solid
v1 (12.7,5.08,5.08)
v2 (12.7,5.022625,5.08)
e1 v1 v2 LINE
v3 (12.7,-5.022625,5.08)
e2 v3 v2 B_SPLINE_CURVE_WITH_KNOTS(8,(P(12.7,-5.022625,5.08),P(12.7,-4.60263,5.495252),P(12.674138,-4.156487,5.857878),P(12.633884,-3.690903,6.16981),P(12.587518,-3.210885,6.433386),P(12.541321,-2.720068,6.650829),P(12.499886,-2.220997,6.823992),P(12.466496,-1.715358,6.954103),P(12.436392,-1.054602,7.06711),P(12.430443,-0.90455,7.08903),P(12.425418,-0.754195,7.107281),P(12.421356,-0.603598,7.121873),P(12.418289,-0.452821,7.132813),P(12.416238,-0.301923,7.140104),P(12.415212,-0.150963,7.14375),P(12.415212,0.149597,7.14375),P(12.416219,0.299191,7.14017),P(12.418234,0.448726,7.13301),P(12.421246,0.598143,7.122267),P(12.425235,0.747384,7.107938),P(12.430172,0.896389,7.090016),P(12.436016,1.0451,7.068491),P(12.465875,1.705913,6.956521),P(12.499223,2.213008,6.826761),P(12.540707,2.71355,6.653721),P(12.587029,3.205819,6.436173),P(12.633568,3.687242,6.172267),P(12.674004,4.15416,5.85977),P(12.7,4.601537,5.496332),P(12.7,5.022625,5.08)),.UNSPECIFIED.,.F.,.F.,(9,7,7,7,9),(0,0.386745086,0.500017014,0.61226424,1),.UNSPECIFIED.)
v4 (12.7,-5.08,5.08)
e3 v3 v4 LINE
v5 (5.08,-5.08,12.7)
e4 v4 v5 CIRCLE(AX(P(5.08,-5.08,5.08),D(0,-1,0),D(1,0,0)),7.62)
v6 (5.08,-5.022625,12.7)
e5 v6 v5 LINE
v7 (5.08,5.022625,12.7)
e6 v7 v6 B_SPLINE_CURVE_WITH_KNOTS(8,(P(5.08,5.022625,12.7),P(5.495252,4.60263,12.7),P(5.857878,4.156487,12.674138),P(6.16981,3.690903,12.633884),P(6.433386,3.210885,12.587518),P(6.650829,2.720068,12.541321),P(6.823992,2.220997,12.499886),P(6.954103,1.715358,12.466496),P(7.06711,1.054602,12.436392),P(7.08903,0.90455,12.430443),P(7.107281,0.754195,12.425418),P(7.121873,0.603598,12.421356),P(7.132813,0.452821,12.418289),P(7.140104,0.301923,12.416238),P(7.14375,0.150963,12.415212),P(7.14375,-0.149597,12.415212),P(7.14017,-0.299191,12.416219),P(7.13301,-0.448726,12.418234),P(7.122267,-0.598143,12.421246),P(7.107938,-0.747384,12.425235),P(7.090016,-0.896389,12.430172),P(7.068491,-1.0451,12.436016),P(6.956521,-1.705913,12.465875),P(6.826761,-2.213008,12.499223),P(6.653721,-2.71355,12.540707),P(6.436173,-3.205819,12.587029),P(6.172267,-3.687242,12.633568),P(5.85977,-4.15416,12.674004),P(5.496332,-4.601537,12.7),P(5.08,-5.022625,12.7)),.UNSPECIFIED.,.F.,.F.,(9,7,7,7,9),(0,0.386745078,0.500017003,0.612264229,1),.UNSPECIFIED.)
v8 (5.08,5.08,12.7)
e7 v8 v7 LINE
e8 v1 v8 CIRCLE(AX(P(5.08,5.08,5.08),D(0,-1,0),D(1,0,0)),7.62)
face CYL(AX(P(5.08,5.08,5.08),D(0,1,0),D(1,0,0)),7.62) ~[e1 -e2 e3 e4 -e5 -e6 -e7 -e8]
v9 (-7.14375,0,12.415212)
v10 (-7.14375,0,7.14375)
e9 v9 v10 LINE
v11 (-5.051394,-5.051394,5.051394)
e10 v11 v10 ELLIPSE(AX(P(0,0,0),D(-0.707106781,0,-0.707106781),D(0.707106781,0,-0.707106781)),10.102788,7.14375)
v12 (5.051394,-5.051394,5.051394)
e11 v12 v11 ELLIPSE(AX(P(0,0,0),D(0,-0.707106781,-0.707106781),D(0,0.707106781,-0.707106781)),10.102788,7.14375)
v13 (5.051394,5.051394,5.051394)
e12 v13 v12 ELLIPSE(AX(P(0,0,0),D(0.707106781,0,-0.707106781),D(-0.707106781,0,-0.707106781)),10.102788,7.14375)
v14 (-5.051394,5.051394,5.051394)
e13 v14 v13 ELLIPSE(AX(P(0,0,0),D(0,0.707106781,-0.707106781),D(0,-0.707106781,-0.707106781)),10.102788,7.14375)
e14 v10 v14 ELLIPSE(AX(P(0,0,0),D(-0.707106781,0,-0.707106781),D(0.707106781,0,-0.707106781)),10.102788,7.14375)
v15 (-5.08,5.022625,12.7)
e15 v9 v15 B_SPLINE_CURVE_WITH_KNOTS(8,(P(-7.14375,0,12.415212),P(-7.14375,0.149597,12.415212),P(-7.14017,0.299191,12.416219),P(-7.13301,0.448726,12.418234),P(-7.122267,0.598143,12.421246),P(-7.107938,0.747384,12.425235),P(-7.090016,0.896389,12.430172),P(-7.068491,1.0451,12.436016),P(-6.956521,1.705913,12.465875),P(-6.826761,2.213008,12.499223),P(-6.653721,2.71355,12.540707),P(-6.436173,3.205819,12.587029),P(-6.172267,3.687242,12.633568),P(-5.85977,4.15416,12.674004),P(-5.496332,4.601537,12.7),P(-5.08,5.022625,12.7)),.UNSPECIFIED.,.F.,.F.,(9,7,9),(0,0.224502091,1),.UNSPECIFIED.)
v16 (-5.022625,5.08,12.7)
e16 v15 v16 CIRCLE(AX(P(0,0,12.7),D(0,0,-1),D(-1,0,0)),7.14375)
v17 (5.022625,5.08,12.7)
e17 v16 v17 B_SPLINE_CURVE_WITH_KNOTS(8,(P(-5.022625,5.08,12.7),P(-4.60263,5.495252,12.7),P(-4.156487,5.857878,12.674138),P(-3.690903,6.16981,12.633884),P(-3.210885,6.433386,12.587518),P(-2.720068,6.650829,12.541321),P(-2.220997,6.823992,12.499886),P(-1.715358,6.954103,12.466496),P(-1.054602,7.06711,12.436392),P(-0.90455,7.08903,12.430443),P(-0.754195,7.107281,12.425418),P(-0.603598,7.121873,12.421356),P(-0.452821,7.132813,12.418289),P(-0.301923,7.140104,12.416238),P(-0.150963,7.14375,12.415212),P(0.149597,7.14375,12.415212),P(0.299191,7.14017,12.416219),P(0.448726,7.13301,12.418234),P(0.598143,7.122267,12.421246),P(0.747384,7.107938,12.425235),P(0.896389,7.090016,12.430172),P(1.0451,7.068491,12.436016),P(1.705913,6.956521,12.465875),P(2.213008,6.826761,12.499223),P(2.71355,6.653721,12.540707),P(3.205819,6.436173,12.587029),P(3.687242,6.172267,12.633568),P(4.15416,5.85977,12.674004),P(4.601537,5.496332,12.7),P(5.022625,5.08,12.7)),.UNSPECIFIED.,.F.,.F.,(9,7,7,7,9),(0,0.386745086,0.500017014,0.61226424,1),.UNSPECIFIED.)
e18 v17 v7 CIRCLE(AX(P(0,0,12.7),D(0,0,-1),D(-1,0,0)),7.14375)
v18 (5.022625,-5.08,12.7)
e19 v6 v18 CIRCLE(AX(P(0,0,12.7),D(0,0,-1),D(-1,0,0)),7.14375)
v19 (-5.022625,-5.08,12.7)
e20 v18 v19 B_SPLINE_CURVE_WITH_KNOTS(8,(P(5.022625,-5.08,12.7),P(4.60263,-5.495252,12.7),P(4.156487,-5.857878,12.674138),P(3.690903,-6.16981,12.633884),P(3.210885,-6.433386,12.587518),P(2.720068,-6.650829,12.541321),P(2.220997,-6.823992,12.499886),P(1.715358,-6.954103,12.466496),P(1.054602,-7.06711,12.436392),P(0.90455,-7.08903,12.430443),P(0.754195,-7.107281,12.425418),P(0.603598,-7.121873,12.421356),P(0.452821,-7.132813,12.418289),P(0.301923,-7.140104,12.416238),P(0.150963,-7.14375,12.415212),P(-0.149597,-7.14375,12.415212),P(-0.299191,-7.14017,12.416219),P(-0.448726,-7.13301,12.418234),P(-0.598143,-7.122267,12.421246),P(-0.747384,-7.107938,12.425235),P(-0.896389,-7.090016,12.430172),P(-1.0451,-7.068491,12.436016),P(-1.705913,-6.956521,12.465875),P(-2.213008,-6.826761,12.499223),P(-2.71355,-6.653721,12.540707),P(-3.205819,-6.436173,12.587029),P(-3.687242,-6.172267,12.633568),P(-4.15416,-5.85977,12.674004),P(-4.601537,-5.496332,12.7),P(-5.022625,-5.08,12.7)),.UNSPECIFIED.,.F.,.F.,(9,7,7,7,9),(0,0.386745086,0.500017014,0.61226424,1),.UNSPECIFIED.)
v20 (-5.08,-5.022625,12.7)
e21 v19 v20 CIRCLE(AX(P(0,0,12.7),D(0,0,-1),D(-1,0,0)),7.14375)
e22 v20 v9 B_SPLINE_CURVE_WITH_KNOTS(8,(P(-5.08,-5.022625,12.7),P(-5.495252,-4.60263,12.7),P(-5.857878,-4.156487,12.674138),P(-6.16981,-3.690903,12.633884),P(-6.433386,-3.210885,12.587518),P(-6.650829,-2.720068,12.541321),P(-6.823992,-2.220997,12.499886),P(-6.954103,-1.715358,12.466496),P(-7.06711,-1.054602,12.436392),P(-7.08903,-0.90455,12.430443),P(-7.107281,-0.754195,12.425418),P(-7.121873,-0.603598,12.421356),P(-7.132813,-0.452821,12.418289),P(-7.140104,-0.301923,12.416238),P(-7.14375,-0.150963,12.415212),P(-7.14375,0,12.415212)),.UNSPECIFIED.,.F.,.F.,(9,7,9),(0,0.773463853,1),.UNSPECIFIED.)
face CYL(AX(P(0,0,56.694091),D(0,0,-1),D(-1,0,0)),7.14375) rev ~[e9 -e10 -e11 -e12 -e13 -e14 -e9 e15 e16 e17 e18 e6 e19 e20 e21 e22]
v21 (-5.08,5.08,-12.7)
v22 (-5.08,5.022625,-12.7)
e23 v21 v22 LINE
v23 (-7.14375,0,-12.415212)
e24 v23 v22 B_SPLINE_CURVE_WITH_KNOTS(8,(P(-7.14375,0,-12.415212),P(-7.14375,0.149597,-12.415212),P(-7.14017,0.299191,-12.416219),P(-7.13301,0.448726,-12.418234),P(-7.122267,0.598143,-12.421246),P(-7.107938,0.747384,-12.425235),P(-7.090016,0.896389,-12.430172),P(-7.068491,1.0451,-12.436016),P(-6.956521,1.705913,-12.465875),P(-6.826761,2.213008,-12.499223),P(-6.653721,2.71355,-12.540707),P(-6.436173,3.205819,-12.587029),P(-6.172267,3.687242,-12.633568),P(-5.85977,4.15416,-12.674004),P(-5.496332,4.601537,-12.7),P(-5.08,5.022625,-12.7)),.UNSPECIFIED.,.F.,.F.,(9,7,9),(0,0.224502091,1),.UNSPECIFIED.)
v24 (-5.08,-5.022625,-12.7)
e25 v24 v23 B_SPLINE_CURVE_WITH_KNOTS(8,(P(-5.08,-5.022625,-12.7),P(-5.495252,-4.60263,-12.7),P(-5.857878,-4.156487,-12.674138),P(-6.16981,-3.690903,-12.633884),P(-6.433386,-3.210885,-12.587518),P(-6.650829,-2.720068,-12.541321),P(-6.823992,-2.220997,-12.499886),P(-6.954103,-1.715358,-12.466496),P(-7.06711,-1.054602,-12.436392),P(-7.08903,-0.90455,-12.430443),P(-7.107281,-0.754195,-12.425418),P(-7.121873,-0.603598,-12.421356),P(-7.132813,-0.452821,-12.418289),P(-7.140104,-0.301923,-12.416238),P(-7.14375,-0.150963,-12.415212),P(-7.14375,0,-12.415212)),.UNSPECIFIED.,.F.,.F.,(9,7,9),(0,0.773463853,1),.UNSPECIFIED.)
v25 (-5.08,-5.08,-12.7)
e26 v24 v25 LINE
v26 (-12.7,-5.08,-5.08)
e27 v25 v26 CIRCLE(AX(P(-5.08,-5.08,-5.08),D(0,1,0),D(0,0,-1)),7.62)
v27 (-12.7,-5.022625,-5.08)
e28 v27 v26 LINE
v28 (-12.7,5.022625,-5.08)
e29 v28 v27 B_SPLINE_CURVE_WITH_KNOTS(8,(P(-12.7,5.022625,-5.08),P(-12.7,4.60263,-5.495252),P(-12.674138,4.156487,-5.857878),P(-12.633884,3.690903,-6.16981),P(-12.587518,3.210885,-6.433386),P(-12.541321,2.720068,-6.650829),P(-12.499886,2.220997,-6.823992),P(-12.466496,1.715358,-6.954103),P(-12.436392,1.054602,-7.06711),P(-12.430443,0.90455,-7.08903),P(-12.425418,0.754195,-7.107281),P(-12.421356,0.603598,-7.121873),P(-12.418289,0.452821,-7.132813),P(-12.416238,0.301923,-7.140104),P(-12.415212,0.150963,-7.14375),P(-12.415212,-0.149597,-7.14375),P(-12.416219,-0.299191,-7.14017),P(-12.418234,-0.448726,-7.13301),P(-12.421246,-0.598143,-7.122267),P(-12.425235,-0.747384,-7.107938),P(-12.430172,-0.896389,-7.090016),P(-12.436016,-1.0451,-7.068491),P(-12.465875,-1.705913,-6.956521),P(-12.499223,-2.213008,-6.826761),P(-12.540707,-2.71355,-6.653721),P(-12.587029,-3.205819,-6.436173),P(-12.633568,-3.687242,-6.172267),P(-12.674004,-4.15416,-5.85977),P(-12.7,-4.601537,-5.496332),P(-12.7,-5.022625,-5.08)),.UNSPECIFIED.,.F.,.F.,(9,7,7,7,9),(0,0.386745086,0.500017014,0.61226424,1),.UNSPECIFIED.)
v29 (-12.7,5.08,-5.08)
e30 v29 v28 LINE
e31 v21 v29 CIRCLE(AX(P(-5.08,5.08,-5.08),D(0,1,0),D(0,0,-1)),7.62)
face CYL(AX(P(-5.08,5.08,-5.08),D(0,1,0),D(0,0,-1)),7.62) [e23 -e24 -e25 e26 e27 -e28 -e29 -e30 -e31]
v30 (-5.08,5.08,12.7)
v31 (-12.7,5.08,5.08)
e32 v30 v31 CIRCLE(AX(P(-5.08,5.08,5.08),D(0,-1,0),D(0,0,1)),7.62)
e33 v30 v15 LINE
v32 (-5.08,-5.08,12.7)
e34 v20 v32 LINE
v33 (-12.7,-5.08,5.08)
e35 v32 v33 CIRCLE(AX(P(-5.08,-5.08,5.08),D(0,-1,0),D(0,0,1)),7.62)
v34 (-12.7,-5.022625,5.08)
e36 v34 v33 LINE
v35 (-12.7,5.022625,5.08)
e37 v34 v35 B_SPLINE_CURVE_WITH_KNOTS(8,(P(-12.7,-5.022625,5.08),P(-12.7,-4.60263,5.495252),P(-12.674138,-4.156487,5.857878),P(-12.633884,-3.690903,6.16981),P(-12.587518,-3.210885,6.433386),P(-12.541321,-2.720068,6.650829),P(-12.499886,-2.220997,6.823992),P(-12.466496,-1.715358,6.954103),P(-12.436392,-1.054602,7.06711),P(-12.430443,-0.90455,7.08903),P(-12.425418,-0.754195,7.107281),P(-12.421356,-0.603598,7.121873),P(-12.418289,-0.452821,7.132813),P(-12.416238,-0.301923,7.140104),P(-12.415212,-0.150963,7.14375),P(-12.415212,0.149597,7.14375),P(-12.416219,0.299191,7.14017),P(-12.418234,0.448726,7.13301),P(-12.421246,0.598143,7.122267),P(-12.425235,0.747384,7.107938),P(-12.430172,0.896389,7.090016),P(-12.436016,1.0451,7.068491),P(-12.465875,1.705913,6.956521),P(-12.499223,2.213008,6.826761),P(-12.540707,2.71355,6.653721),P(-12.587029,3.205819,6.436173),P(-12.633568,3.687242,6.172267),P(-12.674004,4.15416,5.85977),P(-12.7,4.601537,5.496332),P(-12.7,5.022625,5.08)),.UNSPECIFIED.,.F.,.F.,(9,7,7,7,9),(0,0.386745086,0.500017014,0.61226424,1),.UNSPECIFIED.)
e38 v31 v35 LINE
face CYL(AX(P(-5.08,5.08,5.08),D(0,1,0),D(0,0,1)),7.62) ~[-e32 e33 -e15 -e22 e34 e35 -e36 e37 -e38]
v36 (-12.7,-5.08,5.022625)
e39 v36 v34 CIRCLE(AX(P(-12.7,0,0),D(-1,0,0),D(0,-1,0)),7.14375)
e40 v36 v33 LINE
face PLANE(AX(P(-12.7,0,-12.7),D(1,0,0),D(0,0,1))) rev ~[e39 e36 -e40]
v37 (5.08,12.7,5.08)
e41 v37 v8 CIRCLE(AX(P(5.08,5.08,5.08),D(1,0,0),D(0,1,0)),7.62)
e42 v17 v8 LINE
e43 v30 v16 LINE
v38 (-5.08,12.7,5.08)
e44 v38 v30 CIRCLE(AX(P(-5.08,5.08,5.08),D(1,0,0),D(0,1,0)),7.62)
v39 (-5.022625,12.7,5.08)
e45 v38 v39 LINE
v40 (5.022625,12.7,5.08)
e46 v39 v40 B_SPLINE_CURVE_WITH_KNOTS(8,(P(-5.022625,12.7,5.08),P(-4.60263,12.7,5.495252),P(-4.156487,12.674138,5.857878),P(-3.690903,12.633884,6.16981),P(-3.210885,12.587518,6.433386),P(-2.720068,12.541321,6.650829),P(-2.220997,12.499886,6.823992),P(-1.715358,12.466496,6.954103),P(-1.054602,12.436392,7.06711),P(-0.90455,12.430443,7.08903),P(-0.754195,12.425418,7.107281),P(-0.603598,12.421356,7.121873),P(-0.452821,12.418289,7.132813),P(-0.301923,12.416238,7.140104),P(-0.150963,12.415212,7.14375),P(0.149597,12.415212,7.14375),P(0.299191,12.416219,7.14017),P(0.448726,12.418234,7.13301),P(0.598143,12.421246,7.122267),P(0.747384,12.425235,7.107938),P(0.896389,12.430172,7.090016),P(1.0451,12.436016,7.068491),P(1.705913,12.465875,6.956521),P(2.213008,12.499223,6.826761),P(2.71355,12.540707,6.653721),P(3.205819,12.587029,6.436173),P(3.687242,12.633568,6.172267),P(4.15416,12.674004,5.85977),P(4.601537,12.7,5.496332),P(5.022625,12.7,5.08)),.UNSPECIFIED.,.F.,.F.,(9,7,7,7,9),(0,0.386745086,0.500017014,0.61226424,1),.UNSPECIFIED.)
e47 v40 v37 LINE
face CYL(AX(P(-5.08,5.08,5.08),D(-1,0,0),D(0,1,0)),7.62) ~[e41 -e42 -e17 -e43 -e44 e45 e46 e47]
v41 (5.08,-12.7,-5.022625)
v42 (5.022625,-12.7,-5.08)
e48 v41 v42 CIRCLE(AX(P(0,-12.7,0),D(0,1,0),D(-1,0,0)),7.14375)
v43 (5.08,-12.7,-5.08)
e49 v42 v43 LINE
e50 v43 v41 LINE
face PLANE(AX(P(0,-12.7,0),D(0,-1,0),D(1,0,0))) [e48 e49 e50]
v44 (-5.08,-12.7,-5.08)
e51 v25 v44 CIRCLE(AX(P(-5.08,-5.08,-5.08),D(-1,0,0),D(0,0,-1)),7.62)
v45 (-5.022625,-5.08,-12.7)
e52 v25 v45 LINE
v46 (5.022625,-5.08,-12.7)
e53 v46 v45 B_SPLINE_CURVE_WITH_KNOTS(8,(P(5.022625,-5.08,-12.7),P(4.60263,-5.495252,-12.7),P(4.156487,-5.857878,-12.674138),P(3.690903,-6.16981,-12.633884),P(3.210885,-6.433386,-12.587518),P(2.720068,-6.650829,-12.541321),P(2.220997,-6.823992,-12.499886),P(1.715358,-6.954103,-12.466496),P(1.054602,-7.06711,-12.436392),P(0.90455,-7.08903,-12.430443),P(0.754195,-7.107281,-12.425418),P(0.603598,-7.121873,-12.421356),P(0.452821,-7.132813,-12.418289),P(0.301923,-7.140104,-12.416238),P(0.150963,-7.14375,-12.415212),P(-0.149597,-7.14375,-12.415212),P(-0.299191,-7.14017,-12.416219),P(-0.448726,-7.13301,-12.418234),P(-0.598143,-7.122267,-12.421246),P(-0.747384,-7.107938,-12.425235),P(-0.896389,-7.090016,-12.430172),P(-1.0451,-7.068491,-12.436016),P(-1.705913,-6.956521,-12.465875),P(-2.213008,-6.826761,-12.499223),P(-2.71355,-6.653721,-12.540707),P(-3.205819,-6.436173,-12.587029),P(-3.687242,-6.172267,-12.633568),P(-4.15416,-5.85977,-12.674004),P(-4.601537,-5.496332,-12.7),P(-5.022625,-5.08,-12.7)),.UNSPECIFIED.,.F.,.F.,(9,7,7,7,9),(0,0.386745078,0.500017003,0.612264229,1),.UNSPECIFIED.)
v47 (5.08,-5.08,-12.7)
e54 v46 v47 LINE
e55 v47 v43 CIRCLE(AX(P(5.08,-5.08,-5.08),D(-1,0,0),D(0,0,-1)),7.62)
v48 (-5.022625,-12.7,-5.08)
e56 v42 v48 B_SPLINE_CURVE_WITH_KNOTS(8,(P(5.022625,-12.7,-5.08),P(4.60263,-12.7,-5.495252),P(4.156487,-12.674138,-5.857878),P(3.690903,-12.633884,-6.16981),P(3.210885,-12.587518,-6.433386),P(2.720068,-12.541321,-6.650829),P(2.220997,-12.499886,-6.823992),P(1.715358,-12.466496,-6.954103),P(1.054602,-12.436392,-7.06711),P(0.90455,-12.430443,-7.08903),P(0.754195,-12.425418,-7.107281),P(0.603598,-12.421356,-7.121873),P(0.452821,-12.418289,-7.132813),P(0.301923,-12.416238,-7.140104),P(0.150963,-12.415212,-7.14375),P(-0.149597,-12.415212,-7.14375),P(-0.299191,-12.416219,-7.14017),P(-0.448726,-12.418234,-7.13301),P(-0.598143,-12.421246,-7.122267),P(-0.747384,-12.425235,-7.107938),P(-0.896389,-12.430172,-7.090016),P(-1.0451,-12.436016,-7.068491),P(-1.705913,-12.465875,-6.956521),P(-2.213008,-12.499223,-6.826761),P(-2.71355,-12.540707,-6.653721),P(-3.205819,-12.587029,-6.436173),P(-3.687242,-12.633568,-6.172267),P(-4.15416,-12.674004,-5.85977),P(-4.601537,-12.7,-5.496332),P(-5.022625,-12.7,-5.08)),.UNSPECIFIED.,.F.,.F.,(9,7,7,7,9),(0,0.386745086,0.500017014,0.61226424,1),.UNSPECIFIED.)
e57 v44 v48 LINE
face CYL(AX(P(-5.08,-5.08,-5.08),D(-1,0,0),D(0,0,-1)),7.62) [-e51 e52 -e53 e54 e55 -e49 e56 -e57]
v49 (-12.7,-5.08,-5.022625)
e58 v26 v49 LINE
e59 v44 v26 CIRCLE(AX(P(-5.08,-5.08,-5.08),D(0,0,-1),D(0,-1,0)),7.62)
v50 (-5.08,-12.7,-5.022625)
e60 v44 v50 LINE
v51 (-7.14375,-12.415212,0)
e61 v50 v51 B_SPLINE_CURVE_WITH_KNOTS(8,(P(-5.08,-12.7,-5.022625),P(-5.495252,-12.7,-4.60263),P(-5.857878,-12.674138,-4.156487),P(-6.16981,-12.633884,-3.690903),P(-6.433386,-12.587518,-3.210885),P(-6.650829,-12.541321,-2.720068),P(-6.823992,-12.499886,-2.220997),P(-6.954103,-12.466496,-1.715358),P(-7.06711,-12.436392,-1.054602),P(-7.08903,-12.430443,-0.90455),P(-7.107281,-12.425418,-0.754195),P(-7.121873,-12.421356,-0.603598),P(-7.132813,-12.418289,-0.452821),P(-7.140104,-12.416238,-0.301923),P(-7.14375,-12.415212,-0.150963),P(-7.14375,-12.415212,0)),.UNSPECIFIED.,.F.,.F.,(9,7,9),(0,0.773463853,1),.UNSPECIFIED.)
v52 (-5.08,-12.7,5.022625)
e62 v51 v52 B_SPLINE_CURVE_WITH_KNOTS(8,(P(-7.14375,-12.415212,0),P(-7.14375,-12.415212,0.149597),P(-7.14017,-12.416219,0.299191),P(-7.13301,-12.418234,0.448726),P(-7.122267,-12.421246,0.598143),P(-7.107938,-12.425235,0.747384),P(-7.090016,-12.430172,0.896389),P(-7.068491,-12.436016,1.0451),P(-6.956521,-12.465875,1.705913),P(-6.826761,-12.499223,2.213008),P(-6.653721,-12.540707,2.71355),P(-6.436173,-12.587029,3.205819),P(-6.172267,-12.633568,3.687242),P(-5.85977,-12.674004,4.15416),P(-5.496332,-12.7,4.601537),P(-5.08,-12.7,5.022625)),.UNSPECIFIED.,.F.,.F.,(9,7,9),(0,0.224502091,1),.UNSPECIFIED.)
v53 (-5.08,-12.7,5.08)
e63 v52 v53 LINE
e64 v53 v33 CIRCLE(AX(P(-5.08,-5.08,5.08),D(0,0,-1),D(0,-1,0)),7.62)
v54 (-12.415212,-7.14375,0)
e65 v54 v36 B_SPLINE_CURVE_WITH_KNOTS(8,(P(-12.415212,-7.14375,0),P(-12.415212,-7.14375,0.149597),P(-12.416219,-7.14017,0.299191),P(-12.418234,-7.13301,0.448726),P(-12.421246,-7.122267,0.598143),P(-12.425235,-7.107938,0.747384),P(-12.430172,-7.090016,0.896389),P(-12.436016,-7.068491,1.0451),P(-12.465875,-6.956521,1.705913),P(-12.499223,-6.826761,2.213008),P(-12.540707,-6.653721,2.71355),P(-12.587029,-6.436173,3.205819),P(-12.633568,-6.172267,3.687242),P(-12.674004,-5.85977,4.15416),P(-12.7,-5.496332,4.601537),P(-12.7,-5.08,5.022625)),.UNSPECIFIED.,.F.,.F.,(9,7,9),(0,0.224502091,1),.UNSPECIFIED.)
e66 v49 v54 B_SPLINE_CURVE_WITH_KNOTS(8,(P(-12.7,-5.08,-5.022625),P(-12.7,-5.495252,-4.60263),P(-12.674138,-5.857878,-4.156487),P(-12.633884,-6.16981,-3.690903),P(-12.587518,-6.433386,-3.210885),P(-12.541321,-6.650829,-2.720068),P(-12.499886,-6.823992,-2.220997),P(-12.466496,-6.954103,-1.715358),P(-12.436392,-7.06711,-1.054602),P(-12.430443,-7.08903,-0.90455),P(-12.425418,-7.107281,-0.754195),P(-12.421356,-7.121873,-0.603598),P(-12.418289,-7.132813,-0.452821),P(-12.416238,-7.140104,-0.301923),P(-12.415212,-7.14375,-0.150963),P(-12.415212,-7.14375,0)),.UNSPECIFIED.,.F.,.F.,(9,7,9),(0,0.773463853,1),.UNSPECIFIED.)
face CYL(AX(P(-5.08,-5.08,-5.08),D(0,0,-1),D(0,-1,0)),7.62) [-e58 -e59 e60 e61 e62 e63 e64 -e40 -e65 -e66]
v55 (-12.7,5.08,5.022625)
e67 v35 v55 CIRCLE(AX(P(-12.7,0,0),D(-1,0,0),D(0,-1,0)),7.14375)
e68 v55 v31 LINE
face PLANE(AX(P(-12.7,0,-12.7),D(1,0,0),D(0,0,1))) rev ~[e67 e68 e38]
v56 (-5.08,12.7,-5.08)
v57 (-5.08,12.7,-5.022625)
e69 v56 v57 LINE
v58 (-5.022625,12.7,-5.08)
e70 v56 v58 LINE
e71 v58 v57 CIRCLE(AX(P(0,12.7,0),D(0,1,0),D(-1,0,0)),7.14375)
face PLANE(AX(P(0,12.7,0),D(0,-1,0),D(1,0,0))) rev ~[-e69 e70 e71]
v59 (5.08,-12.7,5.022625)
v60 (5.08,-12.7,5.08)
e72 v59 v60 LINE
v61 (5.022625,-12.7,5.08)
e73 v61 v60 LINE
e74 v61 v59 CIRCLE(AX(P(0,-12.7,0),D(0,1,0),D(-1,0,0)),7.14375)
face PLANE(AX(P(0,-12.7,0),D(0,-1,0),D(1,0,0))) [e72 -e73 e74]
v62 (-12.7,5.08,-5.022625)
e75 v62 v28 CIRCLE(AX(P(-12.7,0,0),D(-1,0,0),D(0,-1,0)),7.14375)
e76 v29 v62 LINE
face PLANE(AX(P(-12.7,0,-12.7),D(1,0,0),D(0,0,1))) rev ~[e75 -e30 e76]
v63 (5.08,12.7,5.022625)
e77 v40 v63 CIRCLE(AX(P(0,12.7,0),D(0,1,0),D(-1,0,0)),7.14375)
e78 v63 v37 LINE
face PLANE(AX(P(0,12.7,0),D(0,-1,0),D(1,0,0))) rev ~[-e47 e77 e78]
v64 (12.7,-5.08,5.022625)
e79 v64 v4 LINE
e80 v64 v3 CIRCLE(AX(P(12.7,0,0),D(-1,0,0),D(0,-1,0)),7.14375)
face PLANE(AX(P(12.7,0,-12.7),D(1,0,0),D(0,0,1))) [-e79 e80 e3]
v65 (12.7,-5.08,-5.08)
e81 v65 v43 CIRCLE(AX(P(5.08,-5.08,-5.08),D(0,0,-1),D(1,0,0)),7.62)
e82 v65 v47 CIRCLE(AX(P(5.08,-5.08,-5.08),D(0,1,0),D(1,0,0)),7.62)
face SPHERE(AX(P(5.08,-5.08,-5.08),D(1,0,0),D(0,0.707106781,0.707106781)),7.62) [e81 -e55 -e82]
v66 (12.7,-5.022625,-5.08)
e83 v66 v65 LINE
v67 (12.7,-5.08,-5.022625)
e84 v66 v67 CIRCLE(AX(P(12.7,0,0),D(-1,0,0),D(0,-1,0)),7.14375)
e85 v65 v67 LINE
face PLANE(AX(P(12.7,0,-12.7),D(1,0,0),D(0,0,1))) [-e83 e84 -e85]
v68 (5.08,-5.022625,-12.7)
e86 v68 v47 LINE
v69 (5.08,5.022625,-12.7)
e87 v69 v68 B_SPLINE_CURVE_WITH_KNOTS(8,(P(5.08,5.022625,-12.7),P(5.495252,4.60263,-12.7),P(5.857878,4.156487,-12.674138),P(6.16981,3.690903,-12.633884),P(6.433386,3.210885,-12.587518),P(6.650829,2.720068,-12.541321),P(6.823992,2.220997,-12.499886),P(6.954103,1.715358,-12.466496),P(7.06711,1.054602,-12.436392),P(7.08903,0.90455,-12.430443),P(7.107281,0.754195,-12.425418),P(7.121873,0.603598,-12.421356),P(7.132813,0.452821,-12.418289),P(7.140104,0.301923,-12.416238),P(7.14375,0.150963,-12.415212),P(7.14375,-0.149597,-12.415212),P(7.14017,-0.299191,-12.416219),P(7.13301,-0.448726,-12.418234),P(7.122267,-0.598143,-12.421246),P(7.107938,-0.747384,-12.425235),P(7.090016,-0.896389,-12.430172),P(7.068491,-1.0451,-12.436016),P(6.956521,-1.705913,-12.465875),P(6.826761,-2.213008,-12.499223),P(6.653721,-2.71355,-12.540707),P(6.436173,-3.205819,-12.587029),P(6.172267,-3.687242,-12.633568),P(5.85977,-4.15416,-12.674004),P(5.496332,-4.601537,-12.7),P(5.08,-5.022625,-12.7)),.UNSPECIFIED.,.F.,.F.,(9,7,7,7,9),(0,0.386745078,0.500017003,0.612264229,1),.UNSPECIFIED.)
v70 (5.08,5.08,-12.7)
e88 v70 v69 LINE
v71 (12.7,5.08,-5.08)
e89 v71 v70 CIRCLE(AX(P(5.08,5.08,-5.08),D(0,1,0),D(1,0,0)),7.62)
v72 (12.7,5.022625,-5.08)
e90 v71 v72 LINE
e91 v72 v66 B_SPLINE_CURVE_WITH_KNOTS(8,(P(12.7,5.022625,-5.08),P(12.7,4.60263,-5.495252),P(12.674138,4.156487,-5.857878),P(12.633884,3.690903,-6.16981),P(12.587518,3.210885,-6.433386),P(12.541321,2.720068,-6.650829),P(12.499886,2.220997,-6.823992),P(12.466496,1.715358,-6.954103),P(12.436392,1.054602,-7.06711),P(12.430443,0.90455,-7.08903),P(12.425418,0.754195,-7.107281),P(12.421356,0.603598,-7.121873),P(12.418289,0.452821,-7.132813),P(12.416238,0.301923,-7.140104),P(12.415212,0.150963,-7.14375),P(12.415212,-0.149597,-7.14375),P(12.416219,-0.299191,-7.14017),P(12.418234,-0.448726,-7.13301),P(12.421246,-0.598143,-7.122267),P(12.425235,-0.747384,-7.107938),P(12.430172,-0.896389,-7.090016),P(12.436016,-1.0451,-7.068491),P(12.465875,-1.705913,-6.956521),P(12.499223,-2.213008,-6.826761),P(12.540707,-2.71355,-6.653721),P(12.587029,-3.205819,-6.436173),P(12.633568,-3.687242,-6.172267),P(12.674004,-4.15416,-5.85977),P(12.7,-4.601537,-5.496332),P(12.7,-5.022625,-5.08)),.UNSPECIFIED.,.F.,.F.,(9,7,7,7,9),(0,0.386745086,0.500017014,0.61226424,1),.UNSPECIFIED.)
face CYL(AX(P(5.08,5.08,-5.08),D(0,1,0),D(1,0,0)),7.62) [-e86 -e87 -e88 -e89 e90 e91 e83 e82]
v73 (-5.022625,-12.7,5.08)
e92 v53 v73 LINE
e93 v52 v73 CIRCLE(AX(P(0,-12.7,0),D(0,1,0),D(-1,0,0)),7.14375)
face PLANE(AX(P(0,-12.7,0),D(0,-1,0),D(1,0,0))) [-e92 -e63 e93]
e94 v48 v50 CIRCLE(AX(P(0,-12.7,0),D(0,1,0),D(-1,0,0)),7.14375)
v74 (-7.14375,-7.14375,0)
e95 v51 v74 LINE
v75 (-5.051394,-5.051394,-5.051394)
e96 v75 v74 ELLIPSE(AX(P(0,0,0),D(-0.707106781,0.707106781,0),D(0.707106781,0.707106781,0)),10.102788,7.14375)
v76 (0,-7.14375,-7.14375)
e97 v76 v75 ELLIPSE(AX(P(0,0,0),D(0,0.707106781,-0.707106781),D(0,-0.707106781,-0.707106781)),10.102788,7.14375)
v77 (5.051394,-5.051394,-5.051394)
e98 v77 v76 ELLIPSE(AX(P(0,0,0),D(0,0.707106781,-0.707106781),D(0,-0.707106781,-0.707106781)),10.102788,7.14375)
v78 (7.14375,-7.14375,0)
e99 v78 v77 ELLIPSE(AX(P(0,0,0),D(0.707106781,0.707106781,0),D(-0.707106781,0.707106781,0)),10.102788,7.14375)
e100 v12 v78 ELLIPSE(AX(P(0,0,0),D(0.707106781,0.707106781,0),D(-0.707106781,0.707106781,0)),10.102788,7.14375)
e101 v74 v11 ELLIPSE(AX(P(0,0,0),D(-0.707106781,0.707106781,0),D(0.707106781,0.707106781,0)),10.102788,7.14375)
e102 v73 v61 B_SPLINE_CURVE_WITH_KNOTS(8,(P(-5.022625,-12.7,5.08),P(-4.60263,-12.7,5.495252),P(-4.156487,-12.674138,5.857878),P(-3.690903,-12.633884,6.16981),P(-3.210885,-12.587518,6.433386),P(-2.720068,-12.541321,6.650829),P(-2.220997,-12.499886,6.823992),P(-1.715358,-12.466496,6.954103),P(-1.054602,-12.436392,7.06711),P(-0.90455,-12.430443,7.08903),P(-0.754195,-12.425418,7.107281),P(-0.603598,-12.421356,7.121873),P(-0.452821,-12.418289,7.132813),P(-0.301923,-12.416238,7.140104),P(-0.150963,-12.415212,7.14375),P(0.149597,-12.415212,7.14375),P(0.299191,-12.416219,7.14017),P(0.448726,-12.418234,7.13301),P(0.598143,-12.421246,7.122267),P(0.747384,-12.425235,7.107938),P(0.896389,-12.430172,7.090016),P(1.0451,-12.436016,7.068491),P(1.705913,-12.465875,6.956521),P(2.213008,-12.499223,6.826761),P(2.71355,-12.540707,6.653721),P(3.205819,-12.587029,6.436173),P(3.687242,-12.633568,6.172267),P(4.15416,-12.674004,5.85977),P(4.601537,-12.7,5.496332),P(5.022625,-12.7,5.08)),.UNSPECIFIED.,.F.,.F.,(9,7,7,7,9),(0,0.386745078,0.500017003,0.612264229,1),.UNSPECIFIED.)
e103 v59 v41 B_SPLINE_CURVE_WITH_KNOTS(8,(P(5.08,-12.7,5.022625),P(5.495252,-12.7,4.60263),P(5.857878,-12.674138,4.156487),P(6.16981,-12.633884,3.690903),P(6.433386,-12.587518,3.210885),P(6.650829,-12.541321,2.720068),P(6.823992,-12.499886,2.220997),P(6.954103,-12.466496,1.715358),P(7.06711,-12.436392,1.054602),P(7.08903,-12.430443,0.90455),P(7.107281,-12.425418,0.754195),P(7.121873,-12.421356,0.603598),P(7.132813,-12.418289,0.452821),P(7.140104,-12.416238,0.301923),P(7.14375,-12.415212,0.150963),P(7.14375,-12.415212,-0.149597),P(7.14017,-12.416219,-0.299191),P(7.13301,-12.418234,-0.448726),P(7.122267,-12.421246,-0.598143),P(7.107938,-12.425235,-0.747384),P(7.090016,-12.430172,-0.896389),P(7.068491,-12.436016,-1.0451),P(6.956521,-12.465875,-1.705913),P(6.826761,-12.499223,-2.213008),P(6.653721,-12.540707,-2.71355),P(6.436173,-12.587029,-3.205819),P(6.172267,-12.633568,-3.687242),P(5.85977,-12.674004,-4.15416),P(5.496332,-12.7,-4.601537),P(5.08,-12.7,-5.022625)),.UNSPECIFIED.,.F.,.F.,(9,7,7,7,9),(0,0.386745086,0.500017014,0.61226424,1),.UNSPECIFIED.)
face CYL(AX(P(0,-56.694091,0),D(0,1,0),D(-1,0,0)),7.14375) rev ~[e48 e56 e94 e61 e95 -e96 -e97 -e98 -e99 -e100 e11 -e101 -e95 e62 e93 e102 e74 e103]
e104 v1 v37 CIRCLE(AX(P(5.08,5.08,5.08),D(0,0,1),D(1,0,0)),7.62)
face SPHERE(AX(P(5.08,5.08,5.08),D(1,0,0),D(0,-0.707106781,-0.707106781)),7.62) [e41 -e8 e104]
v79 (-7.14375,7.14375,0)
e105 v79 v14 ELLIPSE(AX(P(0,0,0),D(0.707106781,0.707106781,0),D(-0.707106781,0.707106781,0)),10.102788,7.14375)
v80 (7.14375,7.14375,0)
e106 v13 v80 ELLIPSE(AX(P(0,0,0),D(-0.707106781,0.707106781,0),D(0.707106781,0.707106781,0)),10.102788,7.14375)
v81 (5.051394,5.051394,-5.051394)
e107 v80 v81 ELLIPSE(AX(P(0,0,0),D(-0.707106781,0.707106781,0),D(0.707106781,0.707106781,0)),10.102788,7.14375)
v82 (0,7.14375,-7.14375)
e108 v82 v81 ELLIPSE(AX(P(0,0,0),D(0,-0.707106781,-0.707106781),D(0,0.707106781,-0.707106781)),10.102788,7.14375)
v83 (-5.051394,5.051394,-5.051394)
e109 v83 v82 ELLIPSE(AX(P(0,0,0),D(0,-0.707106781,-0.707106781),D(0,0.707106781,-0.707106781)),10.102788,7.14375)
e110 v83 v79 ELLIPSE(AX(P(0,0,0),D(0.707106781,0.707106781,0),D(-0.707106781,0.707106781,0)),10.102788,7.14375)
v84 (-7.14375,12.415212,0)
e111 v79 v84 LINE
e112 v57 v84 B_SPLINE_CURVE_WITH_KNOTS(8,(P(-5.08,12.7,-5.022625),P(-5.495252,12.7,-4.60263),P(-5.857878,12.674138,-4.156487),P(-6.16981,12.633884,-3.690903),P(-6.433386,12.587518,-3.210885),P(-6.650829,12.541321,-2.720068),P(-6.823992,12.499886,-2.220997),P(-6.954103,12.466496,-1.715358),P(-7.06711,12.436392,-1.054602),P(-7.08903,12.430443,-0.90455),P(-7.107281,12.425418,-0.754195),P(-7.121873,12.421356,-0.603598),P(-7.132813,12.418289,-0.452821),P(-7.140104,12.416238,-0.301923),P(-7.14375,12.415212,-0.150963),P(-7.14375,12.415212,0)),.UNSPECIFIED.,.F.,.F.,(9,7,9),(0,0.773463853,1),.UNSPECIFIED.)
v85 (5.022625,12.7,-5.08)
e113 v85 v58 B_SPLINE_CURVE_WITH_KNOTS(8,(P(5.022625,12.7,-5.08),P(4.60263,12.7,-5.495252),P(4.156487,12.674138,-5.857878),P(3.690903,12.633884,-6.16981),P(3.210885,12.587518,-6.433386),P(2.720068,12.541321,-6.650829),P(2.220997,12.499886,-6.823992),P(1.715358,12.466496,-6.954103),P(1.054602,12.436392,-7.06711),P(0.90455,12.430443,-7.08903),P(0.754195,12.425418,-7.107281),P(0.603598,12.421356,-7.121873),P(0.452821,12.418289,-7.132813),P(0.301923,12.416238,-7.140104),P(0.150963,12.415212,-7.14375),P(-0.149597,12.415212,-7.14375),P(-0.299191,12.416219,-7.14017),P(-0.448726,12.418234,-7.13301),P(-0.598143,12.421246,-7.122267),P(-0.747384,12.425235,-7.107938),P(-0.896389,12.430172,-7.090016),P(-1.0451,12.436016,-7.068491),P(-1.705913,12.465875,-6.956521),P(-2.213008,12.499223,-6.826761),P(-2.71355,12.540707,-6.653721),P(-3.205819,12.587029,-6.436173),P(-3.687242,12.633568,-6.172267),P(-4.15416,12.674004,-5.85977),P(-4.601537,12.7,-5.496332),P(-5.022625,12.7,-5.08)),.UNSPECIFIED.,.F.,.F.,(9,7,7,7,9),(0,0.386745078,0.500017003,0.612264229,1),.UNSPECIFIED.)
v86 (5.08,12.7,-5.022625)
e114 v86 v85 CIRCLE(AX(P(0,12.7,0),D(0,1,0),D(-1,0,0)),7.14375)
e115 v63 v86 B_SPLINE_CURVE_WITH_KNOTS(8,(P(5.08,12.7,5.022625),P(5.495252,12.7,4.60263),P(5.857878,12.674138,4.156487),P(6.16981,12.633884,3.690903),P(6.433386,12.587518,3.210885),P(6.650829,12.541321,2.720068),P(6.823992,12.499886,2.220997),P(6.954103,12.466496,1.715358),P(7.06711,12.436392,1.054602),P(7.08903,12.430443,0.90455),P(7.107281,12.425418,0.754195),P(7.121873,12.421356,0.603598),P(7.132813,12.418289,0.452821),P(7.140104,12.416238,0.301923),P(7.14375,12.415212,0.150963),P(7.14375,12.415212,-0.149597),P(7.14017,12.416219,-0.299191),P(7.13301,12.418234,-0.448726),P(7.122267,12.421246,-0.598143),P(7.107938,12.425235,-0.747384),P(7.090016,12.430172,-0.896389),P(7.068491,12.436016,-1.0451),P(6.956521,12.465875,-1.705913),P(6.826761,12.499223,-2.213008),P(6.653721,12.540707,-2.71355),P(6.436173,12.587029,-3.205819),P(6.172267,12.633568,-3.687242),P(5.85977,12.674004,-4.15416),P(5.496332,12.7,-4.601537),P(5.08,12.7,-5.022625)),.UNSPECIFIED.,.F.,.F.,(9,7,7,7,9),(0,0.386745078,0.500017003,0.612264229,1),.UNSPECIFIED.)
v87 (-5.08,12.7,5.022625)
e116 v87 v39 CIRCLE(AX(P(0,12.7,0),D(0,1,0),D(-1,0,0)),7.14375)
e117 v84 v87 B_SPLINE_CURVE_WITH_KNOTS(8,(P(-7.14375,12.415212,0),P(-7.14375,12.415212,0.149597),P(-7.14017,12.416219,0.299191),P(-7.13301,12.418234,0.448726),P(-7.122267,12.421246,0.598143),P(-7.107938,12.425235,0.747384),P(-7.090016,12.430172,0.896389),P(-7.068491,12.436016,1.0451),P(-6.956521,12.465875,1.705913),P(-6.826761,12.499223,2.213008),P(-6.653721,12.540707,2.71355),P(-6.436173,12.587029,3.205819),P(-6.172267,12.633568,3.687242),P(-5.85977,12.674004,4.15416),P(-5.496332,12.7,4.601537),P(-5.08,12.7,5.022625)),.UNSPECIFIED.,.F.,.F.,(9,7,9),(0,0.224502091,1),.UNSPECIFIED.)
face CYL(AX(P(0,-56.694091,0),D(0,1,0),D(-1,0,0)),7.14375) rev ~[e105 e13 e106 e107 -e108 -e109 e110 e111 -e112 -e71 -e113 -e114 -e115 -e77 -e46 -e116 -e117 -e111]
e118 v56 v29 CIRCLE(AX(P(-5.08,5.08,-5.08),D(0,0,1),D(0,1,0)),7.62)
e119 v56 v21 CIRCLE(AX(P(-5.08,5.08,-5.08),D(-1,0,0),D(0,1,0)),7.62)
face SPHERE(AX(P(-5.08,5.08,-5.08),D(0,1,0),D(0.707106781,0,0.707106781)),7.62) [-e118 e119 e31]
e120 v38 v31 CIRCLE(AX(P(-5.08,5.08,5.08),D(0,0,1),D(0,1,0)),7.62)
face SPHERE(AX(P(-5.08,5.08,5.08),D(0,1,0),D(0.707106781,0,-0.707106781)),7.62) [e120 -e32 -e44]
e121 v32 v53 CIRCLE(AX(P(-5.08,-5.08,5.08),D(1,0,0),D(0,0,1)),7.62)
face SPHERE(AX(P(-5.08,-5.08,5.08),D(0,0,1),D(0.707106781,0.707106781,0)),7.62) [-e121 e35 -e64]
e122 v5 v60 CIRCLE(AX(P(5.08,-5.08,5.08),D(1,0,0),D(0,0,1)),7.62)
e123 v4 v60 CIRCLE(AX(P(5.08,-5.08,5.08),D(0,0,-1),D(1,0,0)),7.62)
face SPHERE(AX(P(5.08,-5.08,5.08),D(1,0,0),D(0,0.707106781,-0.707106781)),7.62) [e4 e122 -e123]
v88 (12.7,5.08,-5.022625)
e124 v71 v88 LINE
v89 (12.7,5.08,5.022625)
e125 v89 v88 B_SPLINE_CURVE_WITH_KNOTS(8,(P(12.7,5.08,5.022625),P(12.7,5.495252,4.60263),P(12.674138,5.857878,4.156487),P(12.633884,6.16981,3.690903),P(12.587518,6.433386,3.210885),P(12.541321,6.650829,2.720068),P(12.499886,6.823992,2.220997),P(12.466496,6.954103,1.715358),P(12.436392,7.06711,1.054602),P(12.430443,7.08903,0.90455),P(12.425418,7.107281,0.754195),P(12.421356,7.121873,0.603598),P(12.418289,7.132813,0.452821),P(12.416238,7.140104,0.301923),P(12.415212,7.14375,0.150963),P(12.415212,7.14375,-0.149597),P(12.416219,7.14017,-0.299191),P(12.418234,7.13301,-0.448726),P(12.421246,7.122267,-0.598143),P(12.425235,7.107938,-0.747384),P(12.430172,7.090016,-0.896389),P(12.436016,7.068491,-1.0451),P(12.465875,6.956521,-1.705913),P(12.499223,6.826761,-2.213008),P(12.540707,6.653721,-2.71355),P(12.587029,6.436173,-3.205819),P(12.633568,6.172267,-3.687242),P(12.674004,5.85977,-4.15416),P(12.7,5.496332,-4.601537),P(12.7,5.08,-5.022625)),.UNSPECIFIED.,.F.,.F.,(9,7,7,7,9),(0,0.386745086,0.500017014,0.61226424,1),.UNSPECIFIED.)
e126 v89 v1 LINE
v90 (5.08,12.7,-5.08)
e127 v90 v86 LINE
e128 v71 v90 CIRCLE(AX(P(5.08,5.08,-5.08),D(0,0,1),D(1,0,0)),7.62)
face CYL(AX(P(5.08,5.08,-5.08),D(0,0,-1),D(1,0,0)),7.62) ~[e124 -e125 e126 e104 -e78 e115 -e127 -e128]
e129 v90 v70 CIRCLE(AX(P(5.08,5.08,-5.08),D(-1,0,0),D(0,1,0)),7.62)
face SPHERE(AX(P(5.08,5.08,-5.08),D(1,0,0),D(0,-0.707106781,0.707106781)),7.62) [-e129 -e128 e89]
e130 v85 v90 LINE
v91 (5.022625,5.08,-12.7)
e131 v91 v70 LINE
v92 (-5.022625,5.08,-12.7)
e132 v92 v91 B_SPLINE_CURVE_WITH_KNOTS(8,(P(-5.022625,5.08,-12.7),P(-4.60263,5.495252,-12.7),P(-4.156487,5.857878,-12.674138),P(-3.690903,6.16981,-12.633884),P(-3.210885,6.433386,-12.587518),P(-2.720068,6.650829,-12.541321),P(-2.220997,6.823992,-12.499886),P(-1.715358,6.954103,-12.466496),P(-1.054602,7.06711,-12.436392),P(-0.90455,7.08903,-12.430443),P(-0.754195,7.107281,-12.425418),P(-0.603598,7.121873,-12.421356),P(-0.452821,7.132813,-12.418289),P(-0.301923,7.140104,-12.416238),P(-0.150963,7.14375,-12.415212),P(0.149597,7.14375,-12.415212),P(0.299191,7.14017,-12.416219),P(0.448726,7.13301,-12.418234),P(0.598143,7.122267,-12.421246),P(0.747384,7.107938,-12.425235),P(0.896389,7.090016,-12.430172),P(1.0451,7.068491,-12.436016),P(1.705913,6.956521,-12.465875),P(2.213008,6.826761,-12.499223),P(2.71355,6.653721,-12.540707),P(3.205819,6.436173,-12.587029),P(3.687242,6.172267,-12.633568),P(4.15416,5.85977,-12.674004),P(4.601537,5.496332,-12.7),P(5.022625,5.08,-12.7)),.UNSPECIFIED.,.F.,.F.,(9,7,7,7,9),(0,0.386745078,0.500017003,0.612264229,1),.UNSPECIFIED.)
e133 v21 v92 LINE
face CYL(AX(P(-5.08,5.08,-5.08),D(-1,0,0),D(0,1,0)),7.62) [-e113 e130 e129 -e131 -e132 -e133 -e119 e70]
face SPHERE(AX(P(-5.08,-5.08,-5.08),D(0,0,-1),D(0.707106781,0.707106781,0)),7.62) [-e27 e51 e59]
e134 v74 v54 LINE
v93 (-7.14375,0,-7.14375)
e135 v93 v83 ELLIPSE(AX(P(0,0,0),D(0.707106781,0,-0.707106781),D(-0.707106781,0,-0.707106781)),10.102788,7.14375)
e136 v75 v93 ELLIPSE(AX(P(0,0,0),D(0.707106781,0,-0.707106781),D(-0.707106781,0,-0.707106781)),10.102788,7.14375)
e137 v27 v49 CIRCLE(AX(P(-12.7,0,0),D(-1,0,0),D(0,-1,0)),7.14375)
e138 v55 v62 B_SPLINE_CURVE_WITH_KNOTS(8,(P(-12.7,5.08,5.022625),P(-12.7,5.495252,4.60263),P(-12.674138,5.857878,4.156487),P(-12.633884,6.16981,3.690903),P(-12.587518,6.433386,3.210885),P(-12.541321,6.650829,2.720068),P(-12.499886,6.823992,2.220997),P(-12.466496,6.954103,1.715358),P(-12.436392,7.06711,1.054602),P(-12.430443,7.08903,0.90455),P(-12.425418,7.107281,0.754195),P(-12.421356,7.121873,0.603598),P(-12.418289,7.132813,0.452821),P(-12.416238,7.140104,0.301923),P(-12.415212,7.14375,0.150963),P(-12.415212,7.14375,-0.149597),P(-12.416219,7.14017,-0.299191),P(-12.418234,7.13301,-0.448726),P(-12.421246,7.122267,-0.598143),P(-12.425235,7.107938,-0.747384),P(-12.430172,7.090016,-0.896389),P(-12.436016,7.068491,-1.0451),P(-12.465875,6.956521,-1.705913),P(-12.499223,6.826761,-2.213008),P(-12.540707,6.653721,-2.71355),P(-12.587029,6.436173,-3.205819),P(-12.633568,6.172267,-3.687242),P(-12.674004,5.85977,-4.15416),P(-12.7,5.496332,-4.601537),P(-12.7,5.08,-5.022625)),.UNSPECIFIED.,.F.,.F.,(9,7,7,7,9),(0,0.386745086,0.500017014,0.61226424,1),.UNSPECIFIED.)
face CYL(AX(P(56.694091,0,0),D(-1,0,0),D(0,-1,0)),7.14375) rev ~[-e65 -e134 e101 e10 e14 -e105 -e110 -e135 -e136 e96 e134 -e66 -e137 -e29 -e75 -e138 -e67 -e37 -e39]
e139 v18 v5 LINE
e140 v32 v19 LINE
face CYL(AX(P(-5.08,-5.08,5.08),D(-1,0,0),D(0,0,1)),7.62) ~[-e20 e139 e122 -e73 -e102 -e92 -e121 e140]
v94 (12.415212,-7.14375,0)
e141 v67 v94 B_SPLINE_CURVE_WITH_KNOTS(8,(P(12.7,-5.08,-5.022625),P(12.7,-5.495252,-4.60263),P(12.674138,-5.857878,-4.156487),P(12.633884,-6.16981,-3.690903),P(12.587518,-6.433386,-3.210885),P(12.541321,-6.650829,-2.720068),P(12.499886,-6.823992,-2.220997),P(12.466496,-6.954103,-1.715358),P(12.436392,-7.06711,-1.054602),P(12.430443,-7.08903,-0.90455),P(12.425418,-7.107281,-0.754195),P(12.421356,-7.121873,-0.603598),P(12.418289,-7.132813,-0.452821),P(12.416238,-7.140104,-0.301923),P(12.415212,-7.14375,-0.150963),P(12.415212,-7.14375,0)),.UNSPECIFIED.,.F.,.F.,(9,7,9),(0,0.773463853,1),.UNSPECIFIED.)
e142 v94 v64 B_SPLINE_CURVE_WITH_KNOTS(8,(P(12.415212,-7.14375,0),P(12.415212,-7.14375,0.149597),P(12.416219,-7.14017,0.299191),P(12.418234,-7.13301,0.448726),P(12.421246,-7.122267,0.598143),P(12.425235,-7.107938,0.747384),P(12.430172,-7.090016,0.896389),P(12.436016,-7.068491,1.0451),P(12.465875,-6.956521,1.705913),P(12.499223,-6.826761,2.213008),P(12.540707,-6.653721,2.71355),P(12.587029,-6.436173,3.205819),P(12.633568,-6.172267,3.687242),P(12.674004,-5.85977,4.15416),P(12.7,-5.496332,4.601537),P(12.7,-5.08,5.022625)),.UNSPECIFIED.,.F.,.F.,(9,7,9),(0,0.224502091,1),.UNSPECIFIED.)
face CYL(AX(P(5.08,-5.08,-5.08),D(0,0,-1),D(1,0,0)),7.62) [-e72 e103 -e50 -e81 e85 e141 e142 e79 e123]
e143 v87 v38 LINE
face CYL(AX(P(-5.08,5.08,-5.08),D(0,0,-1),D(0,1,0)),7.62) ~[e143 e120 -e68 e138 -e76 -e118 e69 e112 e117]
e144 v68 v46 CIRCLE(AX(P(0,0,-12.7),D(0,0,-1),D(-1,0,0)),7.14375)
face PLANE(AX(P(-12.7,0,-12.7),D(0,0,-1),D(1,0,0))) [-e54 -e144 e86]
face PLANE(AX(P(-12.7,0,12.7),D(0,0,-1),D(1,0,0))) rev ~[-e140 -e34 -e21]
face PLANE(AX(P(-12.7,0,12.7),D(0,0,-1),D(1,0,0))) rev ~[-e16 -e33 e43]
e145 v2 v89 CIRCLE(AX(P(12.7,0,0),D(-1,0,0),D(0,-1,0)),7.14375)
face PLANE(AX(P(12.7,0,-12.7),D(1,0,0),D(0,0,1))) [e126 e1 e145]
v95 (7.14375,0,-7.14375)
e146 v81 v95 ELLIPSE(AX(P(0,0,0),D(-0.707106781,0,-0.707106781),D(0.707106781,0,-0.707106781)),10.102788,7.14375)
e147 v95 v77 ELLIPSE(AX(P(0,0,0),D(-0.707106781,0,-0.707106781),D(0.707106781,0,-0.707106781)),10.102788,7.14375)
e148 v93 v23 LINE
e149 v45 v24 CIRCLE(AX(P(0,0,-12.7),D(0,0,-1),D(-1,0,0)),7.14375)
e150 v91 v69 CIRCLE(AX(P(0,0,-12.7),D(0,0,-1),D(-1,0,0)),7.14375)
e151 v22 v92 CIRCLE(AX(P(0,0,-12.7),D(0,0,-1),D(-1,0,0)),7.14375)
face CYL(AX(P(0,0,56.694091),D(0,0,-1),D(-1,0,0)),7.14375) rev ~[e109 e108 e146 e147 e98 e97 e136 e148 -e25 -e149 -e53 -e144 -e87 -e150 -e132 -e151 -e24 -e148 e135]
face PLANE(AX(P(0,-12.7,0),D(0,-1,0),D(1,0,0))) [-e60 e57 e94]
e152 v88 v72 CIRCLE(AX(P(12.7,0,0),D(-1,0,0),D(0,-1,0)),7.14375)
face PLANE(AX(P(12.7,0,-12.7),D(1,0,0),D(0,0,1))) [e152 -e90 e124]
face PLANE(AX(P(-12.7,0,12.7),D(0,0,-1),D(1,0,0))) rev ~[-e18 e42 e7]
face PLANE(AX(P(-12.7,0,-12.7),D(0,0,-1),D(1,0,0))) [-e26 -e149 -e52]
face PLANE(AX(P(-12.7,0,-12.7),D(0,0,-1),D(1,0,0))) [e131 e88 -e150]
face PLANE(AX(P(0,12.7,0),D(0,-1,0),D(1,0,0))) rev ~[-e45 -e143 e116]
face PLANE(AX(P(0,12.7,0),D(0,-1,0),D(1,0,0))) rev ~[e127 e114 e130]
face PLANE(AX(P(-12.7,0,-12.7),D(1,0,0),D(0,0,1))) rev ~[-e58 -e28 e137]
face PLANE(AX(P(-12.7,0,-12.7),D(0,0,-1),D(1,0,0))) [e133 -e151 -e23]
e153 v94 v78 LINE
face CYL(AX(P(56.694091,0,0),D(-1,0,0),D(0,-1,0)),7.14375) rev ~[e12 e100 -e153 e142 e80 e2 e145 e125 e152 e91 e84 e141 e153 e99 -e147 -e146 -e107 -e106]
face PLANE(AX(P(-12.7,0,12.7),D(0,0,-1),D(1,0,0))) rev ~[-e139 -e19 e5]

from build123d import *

# Parameters (mm, degrees)
F0_W         = 25.4
F0_H         = 25.4
F1_DEPTH     = 12.7
F5_D         = 14.2875
F5_ON_F3_D   = 14.2875
F5_ON_F2_D   = 14.2875
F6_T1_DEPTH  = 10.16
F6_T3_DEPTH  = 10.16
F6_T5_DEPTH  = 10.16
F6_S9_W      = 7.62
F6_S9_H      = 7.62
F6_T10_DEPTH = 7.62
F6_S15_W     = 7.62
F6_S15_H     = 7.62
F6_T16_DEPTH = 7.62
F6_S21_W     = 7.62
F6_S21_H     = 7.62
F6_T22_DEPTH = 7.62
F6_S27_W     = 7.62
F6_S27_H     = 7.62
F6_T28_DEPTH = 7.62
F6_S33_W     = 7.62
F6_S33_H     = 7.62
F6_T34_DEPTH = 7.62
F6_S39_W     = 7.62
F6_S39_H     = 7.62
F6_T40_DEPTH = 7.62
F6_S45_W     = 7.62
F6_S45_H     = 7.62
F6_T46_DEPTH = 7.62
F6_S51_W     = 7.62
F6_S51_H     = 7.62
F6_T52_DEPTH = 7.62


# Not quite as in the source:
# - a fillet or chamfer that OpenCascade refuses, or shapes differently, is made with other operations: its cross-section is extruded or revolved along the edge and cut away or added
# - a length typed as a fraction of an inch, garbled in the dataset ("3 / 203.2 mm" for 3/8 in), is restored


with BuildPart() as f1:
    # F0 (on Front) → F1 (new body, symmetric)
    with BuildSketch(Plane.XZ):
        Rectangle(F0_W, F0_H)
    extrude(amount=F1_DEPTH, both=True)

    # F5 (through all)
    with Locations(Plane.XY.offset(12.7)):
        with Locations((0, 0)):
            Hole(F5_D / 2)

    # F5 on F3 (through all)
    with Locations(Plane.XZ.offset(12.7)):
        with Locations((0, 0)):
            Hole(F5_ON_F3_D / 2)

    # F5 on F2 (through all)
    with Locations(Plane.YZ.offset(12.7)):
        with Locations((0, 0)):
            Hole(F5_ON_F2_D / 2)

    # F6: fillet of radius 7.62 on 12 edges, made by hand

    # F6_s2 → F6_t1 (cut)
    with BuildSketch(Plane.XZ.offset(-5.08)):
        with BuildLine():
            ThreePointArc((12.7, 5.08), (10.4681536726, 10.4681536726), (5.08, 12.7))
            Line((5.08, 12.7), (12.7, 12.7))
            Line((12.7, 12.7), (12.7, 5.08))
        make_face()
        with BuildLine():
            ThreePointArc((12.7, -5.08), (10.4681536726, -10.4681536726), (5.08, -12.7))
            Line((5.08, -12.7), (12.7, -12.7))
            Line((12.7, -12.7), (12.7, -5.08))
        make_face()
        with BuildLine():
            ThreePointArc((-5.08, 12.7), (-10.4681536726, 10.4681536726), (-12.7, 5.08))
            Line((-12.7, 5.08), (-12.7, 12.7))
            Line((-12.7, 12.7), (-5.08, 12.7))
        make_face()
        with BuildLine():
            ThreePointArc((-5.08, -12.7), (-10.4681536726, -10.4681536726), (-12.7, -5.08))
            Line((-12.7, -5.08), (-12.7, -12.7))
            Line((-12.7, -12.7), (-5.08, -12.7))
        make_face()
    extrude(amount=F6_T1_DEPTH, mode=Mode.SUBTRACT)

    # F6_s4 → F6_t3 (cut)
    with BuildSketch(Plane.XY.offset(-5.08)):
        with BuildLine():
            ThreePointArc((12.7, 5.08), (10.4681536726, 10.4681536726), (5.08, 12.7))
            Line((5.08, 12.7), (12.7, 12.7))
            Line((12.7, 12.7), (12.7, 5.08))
        make_face()
        with BuildLine():
            ThreePointArc((12.7, -5.08), (10.4681536726, -10.4681536726), (5.08, -12.7))
            Line((5.08, -12.7), (12.7, -12.7))
            Line((12.7, -12.7), (12.7, -5.08))
        make_face()
        with BuildLine():
            ThreePointArc((-5.08, -12.7), (-10.4681536726, -10.4681536726), (-12.7, -5.08))
            Line((-12.7, -5.08), (-12.7, -12.7))
            Line((-12.7, -12.7), (-5.08, -12.7))
        make_face()
        with BuildLine():
            ThreePointArc((-5.08, 12.7), (-10.4681536726, 10.4681536726), (-12.7, 5.08))
            Line((-12.7, 5.08), (-12.7, 12.7))
            Line((-12.7, 12.7), (-5.08, 12.7))
        make_face()
    extrude(amount=F6_T3_DEPTH, mode=Mode.SUBTRACT)

    # F6_s6 → F6_t5 (cut)
    with BuildSketch(Plane.YZ.offset(-5.08)):
        with BuildLine():
            ThreePointArc((-5.08, 12.7), (-10.4681536726, 10.4681536726), (-12.7, 5.08))
            Line((-12.7, 5.08), (-12.7, 12.7))
            Line((-12.7, 12.7), (-5.08, 12.7))
        make_face()
        with BuildLine():
            ThreePointArc((-5.08, -12.7), (-10.4681536726, -10.4681536726), (-12.7, -5.08))
            Line((-12.7, -5.08), (-12.7, -12.7))
            Line((-12.7, -12.7), (-5.08, -12.7))
        make_face()
        with BuildLine():
            ThreePointArc((12.7, 5.08), (10.4681536726, 10.4681536726), (5.08, 12.7))
            Line((5.08, 12.7), (12.7, 12.7))
            Line((12.7, 12.7), (12.7, 5.08))
        make_face()
        with BuildLine():
            ThreePointArc((12.7, -5.08), (10.4681536726, -10.4681536726), (5.08, -12.7))
            Line((5.08, -12.7), (12.7, -12.7))
            Line((12.7, -12.7), (12.7, -5.08))
        make_face()
    extrude(amount=F6_T5_DEPTH, mode=Mode.SUBTRACT)


with BuildPart() as f6_tool8:
    # F6_s9 → F6_t10 (new body)
    with BuildSketch(Plane.YZ.offset(5.08)):
        with Locations((8.89, 8.89)):
            Rectangle(F6_S9_W, F6_S9_H)
    extrude(amount=F6_T10_DEPTH)

    # F6_s11 → F6_t12 (revolve, cut)
    with BuildSketch(Plane(origin=(5.08, 5.08, 5.08), x_dir=(0, -0.7071067812, -0.7071067812), z_dir=(0, -0.7071067812, 0.7071067812))):
        with BuildLine():
            ThreePointArc((0, -7.62), (7.62, 0), (0, 7.62))
            Line((0, 7.62), (0, -7.62))
        make_face()
    revolve(axis=Axis((5.08, 5.08, 5.08), (1, 0, 0)), mode=Mode.SUBTRACT)


with BuildPart() as f1_1:
    add(f1.part)

    # F6_t7: cut F6_tool8
    add(f6_tool8.part, mode=Mode.SUBTRACT)


with BuildPart() as f6_tool14:
    # F6_s15 → F6_t16 (new body)
    with BuildSketch(Plane.YZ.offset(5.08)):
        with Locations((-8.89, 8.89)):
            Rectangle(F6_S15_W, F6_S15_H)
    extrude(amount=F6_T16_DEPTH)

    # F6_s17 → F6_t18 (revolve, cut)
    with BuildSketch(Plane(origin=(5.08, -5.08, 5.08), x_dir=(0, 0.7071067812, -0.7071067812), z_dir=(0, -0.7071067812, -0.7071067812))):
        with BuildLine():
            ThreePointArc((0, -7.62), (7.62, 0), (0, 7.62))
            Line((0, 7.62), (0, -7.62))
        make_face()
    revolve(axis=Axis((5.08, -5.08, 5.08), (1, 0, 0)), mode=Mode.SUBTRACT)


with BuildPart() as f1_2:
    add(f1_1.part)

    # F6_t13: cut F6_tool14
    add(f6_tool14.part, mode=Mode.SUBTRACT)


with BuildPart() as f6_tool20:
    # F6_s21 → F6_t22 (new body)
    with BuildSketch(Plane.YZ.offset(5.08)):
        with Locations((-8.89, -8.89)):
            Rectangle(F6_S21_W, F6_S21_H)
    extrude(amount=F6_T22_DEPTH)

    # F6_s23 → F6_t24 (revolve, cut)
    with BuildSketch(Plane(origin=(5.08, -5.08, -5.08), x_dir=(0, 0.7071067812, 0.7071067812), z_dir=(0, 0.7071067812, -0.7071067812))):
        with BuildLine():
            ThreePointArc((0, -7.62), (7.62, 0), (0, 7.62))
            Line((0, 7.62), (0, -7.62))
        make_face()
    revolve(axis=Axis((5.08, -5.08, -5.08), (1, 0, 0)), mode=Mode.SUBTRACT)


with BuildPart() as f1_3:
    add(f1_2.part)

    # F6_t19: cut F6_tool20
    add(f6_tool20.part, mode=Mode.SUBTRACT)


with BuildPart() as f6_tool26:
    # F6_s27 → F6_t28 (new body)
    with BuildSketch(Plane.YZ.offset(5.08)):
        with Locations((8.89, -8.89)):
            Rectangle(F6_S27_W, F6_S27_H)
    extrude(amount=F6_T28_DEPTH)

    # F6_s29 → F6_t30 (revolve, cut)
    with BuildSketch(Plane(origin=(5.08, 5.08, -5.08), x_dir=(0, -0.7071067812, 0.7071067812), z_dir=(0, 0.7071067812, 0.7071067812))):
        with BuildLine():
            ThreePointArc((0, -7.62), (7.62, 0), (0, 7.62))
            Line((0, 7.62), (0, -7.62))
        make_face()
    revolve(axis=Axis((5.08, 5.08, -5.08), (1, 0, 0)), mode=Mode.SUBTRACT)


with BuildPart() as f1_4:
    add(f1_3.part)

    # F6_t25: cut F6_tool26
    add(f6_tool26.part, mode=Mode.SUBTRACT)


with BuildPart() as f6_tool32:
    # F6_s33 → F6_t34 (new body)
    with BuildSketch(Plane.XY.offset(5.08)):
        with Locations((-8.89, -8.89)):
            Rectangle(F6_S33_W, F6_S33_H)
    extrude(amount=F6_T34_DEPTH)

    # F6_s35 → F6_t36 (revolve, cut)
    with BuildSketch(Plane(origin=(-5.08, -5.08, 5.08), x_dir=(0.7071067812, 0.7071067812, 0), z_dir=(0.7071067812, -0.7071067812, 0))):
        with BuildLine():
            ThreePointArc((0, -7.62), (7.62, 0), (0, 7.62))
            Line((0, 7.62), (0, -7.62))
        make_face()
    revolve(axis=Axis((-5.08, -5.08, 5.08), (0, 0, 1)), mode=Mode.SUBTRACT)


with BuildPart() as f1_5:
    add(f1_4.part)

    # F6_t31: cut F6_tool32
    add(f6_tool32.part, mode=Mode.SUBTRACT)


with BuildPart() as f6_tool38:
    # F6_s39 → F6_t40 (new body)
    with BuildSketch(Plane.XY.offset(-5.08)):
        with Locations((-8.89, -8.89)):
            Rectangle(F6_S39_W, F6_S39_H)
    extrude(amount=-F6_T40_DEPTH)

    # F6_s41 → F6_t42 (revolve, cut)
    with BuildSketch(Plane(origin=(-5.08, -5.08, -5.08), x_dir=(0.7071067812, 0.7071067812, 0), z_dir=(-0.7071067812, 0.7071067812, 0))):
        with BuildLine():
            ThreePointArc((0, -7.62), (7.62, 0), (0, 7.62))
            Line((0, 7.62), (0, -7.62))
        make_face()
    revolve(axis=Axis((-5.08, -5.08, -5.08), (0, 0, -1)), mode=Mode.SUBTRACT)


with BuildPart() as f1_6:
    add(f1_5.part)

    # F6_t37: cut F6_tool38
    add(f6_tool38.part, mode=Mode.SUBTRACT)


with BuildPart() as f6_tool44:
    # F6_s45 → F6_t46 (new body)
    with BuildSketch(Plane.XZ.offset(-5.08)):
        with Locations((-8.89, 8.89)):
            Rectangle(F6_S45_W, F6_S45_H)
    extrude(amount=-F6_T46_DEPTH)

    # F6_s47 → F6_t48 (revolve, cut)
    with BuildSketch(Plane(origin=(-5.08, 5.08, 5.08), x_dir=(0.7071067812, 0, -0.7071067812), z_dir=(0.7071067812, 0, 0.7071067812))):
        with BuildLine():
            ThreePointArc((0, -7.62), (7.62, 0), (0, 7.62))
            Line((0, 7.62), (0, -7.62))
        make_face()
    revolve(axis=Axis((-5.08, 5.08, 5.08), (0, 1, 0)), mode=Mode.SUBTRACT)


with BuildPart() as f1_7:
    add(f1_6.part)

    # F6_t43: cut F6_tool44
    add(f6_tool44.part, mode=Mode.SUBTRACT)


with BuildPart() as f6_tool50:
    # F6_s51 → F6_t52 (new body)
    with BuildSketch(Plane.XZ.offset(-5.08)):
        with Locations((-8.89, -8.89)):
            Rectangle(F6_S51_W, F6_S51_H)
    extrude(amount=-F6_T52_DEPTH)

    # F6_s53 → F6_t54 (revolve, cut)
    with BuildSketch(Plane(origin=(-5.08, 5.08, -5.08), x_dir=(0.7071067812, 0, 0.7071067812), z_dir=(-0.7071067812, 0, 0.7071067812))):
        with BuildLine():
            ThreePointArc((0, -7.62), (7.62, 0), (0, 7.62))
            Line((0, 7.62), (0, -7.62))
        make_face()
    revolve(axis=Axis((-5.08, 5.08, -5.08), (0, 1, 0)), mode=Mode.SUBTRACT)


with BuildPart() as f1_8:
    add(f1_7.part)

    # F6_t49: cut F6_tool50
    add(f6_tool50.part, mode=Mode.SUBTRACT)


solid = f1_8.part
